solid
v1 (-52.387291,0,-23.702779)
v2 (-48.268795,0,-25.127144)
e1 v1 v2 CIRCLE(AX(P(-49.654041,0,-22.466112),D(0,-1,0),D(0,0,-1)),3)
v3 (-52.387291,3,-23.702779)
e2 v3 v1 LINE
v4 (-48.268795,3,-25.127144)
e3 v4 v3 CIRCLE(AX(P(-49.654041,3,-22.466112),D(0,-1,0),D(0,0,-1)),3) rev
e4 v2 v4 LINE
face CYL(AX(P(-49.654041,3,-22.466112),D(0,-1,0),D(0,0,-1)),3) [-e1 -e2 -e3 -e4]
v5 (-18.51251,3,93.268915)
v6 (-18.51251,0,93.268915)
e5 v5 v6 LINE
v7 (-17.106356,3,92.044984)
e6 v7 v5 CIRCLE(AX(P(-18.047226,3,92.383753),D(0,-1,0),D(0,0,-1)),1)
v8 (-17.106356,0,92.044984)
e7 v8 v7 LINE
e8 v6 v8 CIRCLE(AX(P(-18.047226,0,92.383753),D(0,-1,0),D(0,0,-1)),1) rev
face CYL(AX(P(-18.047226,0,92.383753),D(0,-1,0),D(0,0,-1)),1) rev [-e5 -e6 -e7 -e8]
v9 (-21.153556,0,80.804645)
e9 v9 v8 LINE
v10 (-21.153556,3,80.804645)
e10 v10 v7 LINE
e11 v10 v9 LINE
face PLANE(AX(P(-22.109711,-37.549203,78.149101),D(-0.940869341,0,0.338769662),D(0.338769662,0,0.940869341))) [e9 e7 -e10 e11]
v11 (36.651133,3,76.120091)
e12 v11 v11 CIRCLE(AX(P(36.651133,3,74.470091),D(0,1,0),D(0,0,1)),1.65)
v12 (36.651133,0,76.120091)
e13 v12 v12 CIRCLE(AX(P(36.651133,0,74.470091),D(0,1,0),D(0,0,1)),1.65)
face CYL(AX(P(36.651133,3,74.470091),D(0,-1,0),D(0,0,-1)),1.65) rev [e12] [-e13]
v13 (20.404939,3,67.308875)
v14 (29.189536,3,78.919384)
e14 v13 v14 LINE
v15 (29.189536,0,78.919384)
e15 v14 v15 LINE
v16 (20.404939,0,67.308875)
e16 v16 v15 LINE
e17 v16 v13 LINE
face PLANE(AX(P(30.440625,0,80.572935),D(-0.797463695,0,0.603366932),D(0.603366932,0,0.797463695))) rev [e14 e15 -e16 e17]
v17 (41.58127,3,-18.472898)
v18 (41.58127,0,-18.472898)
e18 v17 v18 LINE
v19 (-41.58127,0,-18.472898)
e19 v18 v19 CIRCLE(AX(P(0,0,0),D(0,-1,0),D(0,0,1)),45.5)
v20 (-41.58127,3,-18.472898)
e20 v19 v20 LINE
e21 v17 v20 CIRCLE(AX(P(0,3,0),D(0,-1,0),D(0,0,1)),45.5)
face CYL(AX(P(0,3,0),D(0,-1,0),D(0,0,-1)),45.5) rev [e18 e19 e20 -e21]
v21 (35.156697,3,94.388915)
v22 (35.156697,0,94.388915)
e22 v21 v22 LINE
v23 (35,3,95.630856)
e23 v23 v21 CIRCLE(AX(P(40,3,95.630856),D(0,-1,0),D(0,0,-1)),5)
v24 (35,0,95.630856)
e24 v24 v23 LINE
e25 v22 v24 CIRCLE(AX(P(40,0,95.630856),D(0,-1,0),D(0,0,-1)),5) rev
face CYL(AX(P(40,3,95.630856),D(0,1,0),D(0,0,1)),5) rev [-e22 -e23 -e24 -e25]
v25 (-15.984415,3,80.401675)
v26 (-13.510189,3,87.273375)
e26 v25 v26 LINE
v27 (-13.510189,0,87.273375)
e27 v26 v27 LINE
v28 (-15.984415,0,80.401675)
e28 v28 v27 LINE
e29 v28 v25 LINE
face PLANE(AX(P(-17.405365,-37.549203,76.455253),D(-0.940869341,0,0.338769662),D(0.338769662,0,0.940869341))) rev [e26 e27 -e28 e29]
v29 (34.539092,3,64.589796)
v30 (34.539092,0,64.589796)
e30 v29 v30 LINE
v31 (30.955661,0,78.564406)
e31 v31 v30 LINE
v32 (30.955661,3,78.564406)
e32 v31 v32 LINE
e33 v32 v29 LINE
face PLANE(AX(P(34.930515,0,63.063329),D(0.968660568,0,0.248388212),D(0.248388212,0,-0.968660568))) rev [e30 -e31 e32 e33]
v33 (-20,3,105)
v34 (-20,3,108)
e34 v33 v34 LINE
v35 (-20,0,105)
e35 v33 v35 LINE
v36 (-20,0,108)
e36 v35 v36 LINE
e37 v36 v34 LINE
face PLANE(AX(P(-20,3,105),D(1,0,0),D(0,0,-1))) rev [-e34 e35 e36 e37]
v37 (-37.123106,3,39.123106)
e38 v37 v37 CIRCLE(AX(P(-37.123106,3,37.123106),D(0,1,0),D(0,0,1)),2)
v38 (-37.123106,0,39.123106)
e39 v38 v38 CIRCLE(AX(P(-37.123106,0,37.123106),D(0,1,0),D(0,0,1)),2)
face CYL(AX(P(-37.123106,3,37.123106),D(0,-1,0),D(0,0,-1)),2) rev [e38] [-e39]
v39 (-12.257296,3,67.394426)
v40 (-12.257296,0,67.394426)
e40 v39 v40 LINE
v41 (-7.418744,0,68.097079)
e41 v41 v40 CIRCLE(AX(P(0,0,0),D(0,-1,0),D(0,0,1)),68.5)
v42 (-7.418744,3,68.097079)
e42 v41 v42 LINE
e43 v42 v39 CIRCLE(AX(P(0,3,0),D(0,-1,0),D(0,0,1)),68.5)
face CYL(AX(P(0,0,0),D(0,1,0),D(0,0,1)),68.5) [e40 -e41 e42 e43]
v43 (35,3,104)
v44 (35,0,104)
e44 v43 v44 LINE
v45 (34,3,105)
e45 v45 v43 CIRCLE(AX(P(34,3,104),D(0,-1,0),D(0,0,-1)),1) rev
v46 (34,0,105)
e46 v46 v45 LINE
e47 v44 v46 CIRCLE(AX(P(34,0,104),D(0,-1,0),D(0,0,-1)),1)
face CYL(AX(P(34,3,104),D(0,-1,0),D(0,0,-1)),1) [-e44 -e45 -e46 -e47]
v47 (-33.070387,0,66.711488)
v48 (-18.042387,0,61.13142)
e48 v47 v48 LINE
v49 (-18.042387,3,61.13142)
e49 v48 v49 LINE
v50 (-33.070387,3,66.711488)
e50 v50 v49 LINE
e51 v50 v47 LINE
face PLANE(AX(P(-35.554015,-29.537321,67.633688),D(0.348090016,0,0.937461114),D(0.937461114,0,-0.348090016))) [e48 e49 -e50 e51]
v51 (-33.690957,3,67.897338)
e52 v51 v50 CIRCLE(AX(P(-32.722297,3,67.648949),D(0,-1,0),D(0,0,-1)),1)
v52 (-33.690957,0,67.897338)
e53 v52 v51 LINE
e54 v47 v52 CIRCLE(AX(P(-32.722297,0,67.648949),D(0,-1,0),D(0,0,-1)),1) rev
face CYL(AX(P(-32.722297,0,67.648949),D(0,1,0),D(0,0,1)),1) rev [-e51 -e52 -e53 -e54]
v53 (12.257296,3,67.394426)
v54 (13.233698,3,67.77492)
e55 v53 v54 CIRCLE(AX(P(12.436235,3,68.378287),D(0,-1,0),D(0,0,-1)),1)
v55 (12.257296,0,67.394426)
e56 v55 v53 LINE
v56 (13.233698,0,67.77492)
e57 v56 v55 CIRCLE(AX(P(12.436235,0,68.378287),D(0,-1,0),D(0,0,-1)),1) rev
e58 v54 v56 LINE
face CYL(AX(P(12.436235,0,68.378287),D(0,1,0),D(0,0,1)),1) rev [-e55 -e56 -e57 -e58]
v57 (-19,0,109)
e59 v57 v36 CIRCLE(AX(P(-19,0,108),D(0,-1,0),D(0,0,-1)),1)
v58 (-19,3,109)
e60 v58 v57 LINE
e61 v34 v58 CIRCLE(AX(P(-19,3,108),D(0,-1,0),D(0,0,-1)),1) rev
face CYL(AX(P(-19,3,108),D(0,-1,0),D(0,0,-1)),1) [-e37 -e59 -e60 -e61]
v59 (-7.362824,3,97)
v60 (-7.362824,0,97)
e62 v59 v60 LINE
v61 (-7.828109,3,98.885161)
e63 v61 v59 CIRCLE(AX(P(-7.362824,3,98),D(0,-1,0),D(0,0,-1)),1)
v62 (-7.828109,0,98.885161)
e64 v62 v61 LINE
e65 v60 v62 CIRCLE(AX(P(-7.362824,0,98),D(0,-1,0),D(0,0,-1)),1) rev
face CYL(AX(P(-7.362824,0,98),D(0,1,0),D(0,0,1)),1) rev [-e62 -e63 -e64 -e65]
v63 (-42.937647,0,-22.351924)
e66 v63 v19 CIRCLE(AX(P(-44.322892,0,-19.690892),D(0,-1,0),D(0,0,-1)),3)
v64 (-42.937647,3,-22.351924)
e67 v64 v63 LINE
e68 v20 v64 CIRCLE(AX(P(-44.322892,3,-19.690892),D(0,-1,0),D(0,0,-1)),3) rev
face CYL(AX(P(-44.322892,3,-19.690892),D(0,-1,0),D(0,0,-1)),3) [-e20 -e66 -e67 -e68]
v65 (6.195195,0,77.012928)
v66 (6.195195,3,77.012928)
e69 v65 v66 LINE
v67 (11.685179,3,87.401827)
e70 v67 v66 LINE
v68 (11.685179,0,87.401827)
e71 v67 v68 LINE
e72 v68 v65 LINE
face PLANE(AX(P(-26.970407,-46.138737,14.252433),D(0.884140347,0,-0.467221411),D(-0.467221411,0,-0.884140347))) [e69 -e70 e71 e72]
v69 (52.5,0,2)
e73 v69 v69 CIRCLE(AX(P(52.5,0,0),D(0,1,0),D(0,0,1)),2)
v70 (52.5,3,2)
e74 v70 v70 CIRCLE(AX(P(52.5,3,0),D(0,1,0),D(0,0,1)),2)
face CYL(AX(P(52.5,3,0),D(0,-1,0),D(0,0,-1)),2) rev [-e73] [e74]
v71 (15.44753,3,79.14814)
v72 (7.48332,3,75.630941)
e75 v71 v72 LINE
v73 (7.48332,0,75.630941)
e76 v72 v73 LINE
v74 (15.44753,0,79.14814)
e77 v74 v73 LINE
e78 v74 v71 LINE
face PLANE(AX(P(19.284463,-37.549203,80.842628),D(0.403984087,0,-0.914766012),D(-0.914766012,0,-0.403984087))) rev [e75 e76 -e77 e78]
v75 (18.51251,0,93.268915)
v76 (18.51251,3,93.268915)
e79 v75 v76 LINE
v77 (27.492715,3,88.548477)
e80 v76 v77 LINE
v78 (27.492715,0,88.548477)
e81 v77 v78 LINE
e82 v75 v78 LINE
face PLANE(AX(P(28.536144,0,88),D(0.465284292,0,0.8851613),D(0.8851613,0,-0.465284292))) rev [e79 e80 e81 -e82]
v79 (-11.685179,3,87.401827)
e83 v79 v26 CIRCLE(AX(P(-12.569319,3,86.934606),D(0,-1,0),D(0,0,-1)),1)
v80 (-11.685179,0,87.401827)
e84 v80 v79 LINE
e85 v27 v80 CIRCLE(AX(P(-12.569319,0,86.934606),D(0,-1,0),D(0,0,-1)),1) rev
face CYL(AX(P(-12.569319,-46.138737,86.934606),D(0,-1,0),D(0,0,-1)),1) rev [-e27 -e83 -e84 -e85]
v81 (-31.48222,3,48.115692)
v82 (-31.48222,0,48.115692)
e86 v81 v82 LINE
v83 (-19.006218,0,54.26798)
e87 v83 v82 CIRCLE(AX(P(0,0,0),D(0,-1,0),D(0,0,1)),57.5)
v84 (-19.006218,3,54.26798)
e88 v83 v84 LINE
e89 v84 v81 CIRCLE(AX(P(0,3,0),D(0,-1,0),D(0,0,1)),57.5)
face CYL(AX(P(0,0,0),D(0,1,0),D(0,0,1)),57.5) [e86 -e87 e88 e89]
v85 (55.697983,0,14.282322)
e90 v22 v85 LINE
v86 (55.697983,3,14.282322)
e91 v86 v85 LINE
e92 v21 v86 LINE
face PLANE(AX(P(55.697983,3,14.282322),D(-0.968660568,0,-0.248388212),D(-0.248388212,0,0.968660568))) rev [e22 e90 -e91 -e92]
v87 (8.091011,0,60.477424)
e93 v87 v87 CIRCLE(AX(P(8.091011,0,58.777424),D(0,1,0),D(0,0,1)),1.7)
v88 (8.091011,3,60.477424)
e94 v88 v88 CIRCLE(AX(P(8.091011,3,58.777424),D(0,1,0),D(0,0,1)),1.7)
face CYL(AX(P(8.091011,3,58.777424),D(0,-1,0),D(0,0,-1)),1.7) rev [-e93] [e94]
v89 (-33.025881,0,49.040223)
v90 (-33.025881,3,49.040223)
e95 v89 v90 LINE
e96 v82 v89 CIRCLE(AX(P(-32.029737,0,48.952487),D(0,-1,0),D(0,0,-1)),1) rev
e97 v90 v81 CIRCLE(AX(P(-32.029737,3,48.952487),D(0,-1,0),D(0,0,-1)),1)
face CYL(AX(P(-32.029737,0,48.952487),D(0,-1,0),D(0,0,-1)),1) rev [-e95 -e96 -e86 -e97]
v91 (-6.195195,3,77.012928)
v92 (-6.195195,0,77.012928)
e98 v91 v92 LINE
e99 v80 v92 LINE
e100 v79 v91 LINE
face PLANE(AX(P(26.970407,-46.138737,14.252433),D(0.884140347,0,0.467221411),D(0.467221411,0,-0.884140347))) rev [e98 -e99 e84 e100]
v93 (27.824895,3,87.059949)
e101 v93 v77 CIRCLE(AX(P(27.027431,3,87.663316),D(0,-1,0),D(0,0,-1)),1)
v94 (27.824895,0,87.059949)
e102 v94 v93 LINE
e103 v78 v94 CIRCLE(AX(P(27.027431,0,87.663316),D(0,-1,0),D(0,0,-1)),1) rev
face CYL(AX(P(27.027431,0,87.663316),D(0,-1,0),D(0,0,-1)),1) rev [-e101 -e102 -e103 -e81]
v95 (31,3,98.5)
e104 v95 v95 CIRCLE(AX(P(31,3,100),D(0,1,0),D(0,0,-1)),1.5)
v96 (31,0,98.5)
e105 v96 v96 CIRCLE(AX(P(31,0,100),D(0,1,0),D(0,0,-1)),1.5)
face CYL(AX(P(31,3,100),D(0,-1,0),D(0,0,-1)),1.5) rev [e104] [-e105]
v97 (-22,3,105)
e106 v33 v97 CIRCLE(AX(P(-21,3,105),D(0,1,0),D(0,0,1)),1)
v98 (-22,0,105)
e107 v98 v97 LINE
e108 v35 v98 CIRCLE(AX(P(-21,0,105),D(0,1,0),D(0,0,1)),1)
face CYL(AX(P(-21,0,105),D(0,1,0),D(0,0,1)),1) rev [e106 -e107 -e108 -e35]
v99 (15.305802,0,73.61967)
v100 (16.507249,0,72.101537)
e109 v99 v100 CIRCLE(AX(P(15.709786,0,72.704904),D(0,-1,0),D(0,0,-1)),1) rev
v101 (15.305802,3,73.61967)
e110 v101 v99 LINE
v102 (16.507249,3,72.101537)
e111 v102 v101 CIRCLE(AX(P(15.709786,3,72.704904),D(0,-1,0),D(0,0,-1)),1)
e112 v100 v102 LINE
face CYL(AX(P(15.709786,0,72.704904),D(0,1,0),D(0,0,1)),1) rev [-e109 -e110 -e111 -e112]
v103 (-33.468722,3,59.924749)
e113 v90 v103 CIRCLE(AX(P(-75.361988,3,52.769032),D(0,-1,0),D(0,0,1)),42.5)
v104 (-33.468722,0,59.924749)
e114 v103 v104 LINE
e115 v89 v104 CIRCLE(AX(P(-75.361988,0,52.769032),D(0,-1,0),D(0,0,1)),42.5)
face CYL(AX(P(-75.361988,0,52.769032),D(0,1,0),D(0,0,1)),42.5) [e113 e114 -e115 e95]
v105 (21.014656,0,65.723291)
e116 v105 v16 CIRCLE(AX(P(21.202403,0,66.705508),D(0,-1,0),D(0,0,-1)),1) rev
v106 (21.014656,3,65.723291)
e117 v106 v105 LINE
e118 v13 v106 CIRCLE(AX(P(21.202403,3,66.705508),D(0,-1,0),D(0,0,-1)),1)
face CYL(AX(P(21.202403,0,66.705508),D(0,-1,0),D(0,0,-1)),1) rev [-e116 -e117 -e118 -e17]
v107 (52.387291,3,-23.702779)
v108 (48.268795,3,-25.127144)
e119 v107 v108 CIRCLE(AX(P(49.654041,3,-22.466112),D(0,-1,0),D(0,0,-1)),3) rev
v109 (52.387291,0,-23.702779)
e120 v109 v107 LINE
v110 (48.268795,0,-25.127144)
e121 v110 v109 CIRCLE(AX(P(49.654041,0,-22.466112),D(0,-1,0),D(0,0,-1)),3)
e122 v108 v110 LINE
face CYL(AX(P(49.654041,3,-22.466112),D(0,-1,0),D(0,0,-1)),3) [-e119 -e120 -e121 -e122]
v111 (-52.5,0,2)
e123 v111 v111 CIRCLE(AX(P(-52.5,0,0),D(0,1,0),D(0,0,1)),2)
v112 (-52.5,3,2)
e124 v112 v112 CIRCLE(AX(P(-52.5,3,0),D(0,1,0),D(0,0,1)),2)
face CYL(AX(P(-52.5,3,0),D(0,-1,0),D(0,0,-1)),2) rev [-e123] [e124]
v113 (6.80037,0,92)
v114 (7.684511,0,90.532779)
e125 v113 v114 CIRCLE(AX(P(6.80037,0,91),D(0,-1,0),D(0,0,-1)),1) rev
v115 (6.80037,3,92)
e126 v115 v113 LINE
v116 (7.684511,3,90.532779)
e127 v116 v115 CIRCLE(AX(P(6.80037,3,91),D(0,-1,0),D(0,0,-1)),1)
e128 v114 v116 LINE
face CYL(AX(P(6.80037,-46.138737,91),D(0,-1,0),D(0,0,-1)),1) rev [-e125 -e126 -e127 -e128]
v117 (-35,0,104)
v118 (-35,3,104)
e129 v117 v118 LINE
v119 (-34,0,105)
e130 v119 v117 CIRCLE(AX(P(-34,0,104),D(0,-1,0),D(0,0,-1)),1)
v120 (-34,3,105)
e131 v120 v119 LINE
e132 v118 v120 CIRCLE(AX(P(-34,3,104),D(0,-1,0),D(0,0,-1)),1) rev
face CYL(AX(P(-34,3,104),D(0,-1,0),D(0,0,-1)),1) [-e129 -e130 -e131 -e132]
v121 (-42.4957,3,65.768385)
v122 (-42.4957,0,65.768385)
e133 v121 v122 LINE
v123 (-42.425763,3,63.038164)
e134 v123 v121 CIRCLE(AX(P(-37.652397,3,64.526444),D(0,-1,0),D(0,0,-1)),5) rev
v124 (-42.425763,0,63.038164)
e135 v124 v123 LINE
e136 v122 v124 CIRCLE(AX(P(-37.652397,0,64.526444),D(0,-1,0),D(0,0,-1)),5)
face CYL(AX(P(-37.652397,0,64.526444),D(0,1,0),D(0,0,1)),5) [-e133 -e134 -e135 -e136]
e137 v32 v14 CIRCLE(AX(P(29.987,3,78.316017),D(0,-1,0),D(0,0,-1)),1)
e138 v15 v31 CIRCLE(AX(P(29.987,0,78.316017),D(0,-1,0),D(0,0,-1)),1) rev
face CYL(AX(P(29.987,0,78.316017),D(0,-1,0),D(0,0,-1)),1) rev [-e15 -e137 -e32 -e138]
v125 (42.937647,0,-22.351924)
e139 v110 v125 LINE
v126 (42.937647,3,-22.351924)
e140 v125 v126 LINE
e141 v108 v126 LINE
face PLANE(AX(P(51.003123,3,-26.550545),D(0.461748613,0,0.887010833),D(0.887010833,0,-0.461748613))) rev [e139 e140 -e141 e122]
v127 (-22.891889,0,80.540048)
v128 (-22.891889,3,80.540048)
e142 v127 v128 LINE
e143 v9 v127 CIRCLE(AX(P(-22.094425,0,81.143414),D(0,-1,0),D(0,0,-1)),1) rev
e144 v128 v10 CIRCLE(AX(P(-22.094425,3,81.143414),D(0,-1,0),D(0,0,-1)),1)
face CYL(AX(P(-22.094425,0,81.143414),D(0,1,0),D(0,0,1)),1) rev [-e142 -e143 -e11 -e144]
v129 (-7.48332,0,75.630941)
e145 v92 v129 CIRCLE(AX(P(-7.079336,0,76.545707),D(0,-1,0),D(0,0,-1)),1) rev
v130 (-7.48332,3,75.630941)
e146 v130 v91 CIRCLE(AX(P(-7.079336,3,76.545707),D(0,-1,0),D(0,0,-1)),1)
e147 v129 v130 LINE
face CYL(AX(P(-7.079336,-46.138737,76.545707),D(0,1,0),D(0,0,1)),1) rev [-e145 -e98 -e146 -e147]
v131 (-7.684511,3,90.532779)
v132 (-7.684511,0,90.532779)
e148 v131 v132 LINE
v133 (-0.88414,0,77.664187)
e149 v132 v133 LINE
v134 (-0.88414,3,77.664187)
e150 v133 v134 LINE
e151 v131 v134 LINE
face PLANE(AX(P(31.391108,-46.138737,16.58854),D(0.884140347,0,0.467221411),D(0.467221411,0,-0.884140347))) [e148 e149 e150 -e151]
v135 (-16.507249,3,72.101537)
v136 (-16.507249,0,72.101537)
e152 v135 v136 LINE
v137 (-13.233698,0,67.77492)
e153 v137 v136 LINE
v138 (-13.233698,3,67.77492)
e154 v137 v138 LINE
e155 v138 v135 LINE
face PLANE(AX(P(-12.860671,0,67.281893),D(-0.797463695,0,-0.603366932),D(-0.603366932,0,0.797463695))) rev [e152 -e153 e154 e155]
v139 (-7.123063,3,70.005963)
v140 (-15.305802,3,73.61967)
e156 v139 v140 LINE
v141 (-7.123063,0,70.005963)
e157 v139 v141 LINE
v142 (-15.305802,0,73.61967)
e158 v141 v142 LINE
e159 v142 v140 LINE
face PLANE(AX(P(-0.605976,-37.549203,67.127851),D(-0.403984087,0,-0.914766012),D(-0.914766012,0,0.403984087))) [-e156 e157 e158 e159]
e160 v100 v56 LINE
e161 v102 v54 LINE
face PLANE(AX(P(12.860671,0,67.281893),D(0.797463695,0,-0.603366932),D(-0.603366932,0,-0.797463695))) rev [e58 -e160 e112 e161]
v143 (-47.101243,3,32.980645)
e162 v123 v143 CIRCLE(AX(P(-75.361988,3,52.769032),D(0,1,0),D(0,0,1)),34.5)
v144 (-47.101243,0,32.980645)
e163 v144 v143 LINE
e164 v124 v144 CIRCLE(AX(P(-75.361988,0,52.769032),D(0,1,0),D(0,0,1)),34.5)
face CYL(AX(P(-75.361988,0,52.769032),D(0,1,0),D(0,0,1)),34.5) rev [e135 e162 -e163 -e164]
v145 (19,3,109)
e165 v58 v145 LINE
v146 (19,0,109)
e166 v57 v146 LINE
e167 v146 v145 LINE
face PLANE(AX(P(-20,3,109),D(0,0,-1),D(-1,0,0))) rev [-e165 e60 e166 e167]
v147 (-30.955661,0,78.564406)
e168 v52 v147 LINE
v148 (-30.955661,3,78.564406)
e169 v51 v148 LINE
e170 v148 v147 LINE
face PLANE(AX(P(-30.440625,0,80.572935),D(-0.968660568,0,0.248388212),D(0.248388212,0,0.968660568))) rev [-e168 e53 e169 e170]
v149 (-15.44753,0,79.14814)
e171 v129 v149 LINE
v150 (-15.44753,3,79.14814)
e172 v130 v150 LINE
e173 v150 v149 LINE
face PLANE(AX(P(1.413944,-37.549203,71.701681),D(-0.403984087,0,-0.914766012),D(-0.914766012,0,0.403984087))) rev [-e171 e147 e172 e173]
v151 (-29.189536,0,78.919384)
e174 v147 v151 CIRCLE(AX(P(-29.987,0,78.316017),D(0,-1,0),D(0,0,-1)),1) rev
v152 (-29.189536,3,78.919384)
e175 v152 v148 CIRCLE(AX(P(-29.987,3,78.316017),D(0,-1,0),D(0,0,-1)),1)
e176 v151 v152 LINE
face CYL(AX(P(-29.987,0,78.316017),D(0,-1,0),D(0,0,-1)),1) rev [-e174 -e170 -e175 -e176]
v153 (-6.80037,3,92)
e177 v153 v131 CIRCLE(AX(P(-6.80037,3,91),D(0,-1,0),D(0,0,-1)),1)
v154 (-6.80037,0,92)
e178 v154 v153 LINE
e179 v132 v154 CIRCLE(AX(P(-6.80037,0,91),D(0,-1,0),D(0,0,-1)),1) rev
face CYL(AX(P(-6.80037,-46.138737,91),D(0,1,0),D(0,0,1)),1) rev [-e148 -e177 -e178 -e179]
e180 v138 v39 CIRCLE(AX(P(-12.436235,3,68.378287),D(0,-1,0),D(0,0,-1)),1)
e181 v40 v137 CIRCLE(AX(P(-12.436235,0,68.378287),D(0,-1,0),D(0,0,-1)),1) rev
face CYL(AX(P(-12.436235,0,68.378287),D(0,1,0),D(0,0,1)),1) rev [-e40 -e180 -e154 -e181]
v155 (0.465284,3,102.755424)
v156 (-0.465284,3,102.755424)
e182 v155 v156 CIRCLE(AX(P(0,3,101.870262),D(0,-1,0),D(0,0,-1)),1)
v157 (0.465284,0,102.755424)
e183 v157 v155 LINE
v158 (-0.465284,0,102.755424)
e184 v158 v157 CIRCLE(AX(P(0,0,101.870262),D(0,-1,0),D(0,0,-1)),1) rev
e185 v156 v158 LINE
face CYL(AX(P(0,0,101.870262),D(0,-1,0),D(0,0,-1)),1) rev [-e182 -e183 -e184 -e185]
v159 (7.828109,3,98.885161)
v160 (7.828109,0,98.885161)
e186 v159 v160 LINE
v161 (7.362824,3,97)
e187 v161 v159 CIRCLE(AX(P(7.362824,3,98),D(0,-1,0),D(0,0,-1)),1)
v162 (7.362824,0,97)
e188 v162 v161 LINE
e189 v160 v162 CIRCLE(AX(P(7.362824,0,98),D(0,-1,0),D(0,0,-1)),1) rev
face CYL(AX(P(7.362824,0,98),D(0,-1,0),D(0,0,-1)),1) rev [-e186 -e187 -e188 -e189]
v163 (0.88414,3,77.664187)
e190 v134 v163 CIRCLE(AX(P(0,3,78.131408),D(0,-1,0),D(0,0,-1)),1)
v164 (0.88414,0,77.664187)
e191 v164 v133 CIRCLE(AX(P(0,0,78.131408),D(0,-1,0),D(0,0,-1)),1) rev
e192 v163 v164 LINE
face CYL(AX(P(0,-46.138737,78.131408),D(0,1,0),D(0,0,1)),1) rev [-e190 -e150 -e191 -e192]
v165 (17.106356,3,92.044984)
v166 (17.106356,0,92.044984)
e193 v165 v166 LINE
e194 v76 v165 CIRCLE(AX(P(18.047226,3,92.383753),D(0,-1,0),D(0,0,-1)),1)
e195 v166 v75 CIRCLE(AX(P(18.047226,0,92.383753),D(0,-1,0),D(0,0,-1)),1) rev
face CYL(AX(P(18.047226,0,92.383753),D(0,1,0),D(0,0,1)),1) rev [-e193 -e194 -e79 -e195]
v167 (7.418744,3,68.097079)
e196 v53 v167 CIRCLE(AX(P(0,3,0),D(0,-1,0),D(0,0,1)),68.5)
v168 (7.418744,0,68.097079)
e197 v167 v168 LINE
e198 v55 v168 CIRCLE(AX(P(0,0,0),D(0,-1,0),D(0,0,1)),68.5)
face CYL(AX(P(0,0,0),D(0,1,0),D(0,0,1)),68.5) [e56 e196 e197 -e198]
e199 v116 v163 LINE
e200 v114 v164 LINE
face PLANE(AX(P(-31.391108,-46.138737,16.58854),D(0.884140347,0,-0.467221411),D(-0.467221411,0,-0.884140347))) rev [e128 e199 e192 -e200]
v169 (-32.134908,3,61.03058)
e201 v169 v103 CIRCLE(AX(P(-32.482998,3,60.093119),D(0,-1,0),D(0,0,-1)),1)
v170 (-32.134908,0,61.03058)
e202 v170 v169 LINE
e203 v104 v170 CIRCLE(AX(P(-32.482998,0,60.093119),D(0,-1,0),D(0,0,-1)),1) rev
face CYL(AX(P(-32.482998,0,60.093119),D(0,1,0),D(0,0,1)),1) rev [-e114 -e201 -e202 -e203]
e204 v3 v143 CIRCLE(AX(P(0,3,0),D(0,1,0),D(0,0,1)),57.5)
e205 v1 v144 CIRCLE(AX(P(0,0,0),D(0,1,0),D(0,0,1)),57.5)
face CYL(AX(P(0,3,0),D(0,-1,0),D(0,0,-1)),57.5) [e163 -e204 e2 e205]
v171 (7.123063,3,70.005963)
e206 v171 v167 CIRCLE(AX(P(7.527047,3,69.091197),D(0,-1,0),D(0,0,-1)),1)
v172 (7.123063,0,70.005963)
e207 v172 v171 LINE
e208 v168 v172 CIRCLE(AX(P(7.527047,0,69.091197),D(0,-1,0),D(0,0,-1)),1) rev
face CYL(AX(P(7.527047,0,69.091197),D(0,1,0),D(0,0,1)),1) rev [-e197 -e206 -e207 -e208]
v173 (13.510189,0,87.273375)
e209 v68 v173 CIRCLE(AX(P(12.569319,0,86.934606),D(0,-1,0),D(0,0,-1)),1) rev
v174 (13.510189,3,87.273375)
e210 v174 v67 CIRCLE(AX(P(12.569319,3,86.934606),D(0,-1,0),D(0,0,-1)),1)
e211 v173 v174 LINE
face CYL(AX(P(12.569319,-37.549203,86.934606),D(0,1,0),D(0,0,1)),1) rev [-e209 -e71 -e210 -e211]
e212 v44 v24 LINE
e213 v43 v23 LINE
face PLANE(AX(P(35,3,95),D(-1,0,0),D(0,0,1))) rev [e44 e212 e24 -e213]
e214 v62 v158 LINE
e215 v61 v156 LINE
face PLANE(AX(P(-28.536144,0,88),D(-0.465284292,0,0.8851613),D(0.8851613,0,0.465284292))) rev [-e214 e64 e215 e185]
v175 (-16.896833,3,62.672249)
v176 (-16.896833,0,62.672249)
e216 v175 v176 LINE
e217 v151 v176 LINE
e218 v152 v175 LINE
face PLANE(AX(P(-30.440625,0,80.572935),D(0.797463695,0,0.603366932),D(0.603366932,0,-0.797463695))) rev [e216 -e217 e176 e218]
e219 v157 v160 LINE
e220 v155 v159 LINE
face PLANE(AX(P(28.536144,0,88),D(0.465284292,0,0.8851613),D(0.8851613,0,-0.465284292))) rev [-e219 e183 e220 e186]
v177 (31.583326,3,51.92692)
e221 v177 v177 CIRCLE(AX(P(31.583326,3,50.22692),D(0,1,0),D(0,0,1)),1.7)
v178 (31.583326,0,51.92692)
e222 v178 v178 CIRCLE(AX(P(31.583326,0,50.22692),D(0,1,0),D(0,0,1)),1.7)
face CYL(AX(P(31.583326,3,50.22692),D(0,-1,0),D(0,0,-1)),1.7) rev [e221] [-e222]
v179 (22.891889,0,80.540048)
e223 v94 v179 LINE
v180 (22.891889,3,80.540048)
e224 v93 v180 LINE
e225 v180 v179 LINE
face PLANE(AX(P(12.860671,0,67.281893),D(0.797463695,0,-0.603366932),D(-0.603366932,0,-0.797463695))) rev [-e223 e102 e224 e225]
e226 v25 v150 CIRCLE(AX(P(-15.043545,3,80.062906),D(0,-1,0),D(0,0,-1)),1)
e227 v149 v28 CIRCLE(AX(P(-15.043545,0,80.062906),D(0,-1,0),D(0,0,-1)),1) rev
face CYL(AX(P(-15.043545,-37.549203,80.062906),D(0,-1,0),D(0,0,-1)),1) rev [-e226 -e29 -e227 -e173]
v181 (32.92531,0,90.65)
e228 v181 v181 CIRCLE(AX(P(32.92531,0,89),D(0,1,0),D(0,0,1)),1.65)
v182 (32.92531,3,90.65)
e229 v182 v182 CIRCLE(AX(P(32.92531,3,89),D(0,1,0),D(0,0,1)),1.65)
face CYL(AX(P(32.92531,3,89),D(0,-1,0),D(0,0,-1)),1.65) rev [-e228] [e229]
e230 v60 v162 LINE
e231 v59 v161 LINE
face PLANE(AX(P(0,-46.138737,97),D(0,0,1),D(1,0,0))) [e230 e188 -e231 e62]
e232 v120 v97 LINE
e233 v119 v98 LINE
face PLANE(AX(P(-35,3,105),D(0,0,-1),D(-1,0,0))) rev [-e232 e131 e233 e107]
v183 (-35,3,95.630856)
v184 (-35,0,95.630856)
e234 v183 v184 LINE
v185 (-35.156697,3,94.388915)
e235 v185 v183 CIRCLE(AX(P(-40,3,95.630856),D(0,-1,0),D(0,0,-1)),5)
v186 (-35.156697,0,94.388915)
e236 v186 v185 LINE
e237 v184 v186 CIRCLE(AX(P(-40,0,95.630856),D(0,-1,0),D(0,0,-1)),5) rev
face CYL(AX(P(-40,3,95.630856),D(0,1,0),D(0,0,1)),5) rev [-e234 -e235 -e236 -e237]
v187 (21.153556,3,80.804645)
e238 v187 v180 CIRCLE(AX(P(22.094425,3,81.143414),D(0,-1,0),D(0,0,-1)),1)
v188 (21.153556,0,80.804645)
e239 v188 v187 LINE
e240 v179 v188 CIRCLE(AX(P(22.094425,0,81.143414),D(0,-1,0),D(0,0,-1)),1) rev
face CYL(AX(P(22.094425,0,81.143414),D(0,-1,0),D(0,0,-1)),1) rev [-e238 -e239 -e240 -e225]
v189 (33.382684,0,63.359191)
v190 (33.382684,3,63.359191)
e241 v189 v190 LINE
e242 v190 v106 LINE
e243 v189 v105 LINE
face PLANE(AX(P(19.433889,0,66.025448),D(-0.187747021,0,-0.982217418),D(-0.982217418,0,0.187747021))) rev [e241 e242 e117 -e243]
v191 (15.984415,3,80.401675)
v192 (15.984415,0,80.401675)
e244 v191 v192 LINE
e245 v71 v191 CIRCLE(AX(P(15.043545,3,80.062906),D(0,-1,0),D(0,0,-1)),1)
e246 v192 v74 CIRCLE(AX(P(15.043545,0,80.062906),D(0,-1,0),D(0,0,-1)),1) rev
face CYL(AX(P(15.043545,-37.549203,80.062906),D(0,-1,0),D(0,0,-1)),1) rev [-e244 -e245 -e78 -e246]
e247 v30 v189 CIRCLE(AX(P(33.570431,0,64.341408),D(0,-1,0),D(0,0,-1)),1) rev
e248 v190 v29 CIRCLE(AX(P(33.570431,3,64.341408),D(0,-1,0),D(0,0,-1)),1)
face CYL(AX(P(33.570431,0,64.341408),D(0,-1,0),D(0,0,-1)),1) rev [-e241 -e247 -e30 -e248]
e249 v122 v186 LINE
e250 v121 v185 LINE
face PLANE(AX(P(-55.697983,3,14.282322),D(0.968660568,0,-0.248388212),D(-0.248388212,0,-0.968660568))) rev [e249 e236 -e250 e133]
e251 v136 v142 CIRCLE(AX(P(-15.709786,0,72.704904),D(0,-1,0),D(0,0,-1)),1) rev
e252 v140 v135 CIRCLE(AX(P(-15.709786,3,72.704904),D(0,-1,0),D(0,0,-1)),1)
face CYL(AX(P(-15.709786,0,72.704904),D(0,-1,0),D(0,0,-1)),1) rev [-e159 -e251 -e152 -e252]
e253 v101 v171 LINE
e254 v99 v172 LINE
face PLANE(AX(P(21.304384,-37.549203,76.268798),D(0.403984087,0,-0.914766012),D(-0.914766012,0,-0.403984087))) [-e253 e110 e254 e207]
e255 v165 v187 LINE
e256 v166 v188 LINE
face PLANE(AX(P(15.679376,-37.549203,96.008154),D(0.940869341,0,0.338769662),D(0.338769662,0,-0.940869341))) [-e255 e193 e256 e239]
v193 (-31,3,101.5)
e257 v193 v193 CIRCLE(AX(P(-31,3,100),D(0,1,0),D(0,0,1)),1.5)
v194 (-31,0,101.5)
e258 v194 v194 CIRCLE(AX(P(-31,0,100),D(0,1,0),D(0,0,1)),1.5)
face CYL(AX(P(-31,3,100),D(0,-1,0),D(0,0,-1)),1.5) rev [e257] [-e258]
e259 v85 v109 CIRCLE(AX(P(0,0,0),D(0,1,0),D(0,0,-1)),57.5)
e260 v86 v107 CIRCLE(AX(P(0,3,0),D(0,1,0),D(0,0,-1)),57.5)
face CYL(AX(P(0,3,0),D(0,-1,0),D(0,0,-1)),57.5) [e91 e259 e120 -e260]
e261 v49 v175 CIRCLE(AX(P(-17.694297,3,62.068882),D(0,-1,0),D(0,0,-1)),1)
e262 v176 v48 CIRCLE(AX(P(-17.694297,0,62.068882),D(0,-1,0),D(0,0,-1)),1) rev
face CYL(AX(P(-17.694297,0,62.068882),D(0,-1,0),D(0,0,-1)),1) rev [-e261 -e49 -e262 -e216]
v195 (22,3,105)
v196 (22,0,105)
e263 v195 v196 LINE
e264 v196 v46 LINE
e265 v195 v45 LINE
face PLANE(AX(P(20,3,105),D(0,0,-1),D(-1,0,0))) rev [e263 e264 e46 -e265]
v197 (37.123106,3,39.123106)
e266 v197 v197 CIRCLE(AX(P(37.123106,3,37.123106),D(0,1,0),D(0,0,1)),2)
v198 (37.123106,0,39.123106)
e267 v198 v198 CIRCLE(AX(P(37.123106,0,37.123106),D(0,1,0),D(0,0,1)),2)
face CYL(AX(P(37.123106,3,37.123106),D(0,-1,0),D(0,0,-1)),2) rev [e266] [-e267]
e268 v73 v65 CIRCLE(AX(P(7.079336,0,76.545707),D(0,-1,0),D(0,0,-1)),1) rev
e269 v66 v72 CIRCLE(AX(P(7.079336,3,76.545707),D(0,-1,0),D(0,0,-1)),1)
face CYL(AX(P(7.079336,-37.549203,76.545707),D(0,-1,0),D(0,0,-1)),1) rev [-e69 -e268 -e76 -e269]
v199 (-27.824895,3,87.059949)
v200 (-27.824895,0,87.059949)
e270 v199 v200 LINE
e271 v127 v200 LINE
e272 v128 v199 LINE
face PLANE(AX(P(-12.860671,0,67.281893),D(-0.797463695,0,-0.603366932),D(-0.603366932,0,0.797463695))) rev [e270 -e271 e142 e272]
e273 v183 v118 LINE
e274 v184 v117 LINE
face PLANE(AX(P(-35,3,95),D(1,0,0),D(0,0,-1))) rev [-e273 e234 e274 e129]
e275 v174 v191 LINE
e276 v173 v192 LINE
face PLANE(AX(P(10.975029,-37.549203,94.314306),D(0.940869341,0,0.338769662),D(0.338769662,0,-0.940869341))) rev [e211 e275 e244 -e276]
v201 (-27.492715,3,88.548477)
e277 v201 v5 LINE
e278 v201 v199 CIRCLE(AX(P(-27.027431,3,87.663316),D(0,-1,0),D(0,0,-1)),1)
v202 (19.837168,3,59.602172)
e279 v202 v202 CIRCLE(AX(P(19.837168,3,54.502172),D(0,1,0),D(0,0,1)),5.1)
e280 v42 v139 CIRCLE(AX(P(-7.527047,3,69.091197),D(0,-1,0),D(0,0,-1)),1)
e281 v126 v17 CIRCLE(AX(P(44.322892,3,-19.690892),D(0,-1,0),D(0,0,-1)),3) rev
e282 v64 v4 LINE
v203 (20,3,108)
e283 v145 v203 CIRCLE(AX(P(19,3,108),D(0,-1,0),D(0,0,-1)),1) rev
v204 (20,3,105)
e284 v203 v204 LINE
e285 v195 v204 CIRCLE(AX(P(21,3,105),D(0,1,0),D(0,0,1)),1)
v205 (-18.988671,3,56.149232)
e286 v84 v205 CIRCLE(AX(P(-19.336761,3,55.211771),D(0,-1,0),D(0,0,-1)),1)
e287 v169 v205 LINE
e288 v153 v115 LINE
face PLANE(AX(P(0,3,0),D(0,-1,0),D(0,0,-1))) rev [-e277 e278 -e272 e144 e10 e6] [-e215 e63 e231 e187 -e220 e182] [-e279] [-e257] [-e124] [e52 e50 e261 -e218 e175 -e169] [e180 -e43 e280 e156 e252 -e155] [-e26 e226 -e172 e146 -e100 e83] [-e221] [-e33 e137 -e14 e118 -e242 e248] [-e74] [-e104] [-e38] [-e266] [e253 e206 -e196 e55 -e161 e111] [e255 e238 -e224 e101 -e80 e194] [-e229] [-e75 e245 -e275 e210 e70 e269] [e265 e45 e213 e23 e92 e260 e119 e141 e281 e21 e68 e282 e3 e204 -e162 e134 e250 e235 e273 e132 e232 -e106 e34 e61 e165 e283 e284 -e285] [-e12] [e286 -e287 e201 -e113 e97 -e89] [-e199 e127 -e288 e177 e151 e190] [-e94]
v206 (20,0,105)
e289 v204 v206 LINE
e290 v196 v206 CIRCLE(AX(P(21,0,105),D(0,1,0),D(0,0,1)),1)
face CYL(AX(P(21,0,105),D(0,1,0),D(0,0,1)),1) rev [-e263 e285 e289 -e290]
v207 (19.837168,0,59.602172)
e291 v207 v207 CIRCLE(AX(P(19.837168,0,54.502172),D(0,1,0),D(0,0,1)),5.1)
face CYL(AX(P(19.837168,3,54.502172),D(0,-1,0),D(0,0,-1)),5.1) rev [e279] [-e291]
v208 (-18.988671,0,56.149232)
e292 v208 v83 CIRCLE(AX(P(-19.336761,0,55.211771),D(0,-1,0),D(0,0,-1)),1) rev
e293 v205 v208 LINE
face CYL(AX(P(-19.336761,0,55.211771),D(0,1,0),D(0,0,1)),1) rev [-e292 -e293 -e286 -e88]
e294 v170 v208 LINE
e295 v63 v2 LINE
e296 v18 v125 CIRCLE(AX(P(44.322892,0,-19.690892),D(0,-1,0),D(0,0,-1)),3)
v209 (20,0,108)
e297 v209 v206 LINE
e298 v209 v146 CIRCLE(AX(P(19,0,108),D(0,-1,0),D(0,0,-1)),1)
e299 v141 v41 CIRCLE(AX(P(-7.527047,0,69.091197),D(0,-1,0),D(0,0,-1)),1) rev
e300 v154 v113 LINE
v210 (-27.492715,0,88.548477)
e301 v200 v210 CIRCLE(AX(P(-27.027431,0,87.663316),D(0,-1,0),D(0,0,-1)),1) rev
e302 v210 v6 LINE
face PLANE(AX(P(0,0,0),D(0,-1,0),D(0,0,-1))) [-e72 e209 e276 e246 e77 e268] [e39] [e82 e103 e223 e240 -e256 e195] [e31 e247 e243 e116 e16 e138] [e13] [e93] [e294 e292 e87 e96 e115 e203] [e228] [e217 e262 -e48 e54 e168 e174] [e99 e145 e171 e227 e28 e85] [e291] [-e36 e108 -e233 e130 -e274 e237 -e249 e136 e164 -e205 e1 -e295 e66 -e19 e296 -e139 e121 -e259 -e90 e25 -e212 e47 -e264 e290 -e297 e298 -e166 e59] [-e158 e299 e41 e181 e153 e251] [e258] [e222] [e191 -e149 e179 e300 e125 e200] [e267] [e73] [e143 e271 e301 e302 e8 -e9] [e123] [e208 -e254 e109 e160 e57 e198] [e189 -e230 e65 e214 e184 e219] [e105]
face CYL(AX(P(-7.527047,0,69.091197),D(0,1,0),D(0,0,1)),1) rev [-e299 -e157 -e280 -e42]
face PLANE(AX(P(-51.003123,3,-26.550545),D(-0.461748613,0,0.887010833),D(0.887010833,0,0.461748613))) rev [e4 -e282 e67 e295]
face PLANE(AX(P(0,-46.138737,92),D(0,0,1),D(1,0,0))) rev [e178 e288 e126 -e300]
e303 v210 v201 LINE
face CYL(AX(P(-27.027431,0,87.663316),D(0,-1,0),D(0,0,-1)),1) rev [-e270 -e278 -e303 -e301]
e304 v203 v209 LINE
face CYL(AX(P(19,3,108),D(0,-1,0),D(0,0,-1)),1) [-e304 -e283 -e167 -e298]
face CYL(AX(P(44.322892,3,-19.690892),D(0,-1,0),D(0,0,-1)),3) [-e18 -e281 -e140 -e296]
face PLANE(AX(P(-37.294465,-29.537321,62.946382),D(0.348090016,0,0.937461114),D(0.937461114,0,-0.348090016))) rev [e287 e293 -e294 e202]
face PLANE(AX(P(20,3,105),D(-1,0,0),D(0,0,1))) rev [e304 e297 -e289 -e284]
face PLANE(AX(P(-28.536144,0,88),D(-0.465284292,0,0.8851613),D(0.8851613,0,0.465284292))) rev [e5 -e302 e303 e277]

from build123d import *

# Parameters (mm, degrees)
SKETCH_1_R          = 1.7
SKETCH_1_R_2        = 1.5
SKETCH_1_R_3        = 2
SKETCH_1_R_4        = 5.1
SKETCH_1_R_5        = 1.65
EXTRUDE_1_DEPTH     = 3
SKETCH_3_R          = 1
CUT_EXTRUDE_3_DEPTH = 124.273070863
CUT_EXTRUDE_4_DEPTH = 124.273070863
EXTRUDE_START       = -3
EXTRUDE_1_2_DEPTH   = 3
EXTRUDE_2_DEPTH     = 3
FILLET_4_R          = 1
FILLET_6_R          = 5
FILLET_7_R          = 3


# Read off the part's stored shape, not the designer's step: 拉伸-薄壁1
with BuildPart() as part:
    # 草图1 → Extrude 1 (new body)
    with BuildSketch(Plane(origin=(0, 0, 0), x_dir=(1, 0, 0), z_dir=(0, 1, 0))):
        with BuildLine():
            Line((-51.003122908, 26.550545261), (-40.35899291, 21.009561902))
            ThreePointArc((-40.35899291, 21.009561902), (0, -45.5), (40.35899291, 21.009561902))
            Line((40.35899291, 21.009561902), (51.003122908, 26.550545261))
            ThreePointArc((51.003122908, 26.550545261), (57.123657521, 6.567933576), (55.697982668, -14.282322175))
            Line((55.697982668, -14.282322175), (35, -95))
            Line((35, -95), (35, -105))
            Line((35, -105), (20, -105))
            Line((20, -105), (20, -109))
            Line((20, -109), (-20, -109))
            Line((-20, -109), (-20, -105))
            Line((-20, -105), (-35, -105))
            Line((-35, -105), (-35, -95))
            Line((-35, -95), (-55.697982668, -14.282322175))
            ThreePointArc((-55.697982668, -14.282322175), (-57.123657521, 6.567933576), (-51.003122908, 26.550545261))
        make_face()
        with Locations(Location((8.091010553, -58.777423797, 0), (0, 0, 270))):
            Circle(SKETCH_1_R, mode=Mode.SUBTRACT)
        with Locations(Location((31.583326073, -50.226920214, 0), (0, 0, 270))):
            Circle(SKETCH_1_R, mode=Mode.SUBTRACT)
        with Locations(Location((-31, -100, 0), (0, 0, 270))):
            Circle(SKETCH_1_R_2, mode=Mode.SUBTRACT)
        with Locations(Location((31, -100, 0), (0, 0, 90))):
            Circle(SKETCH_1_R_2, mode=Mode.SUBTRACT)
        with Locations(Location((-37.123106012, -37.123106012, 0), (0, 0, 270))):
            Circle(SKETCH_1_R_3, mode=Mode.SUBTRACT)
        with Locations(Location((-52.5, 0, 0), (0, 0, 270))):
            Circle(SKETCH_1_R_3, mode=Mode.SUBTRACT)
        with Locations(Location((52.5, 0, 0), (0, 0, 270))):
            Circle(SKETCH_1_R_3, mode=Mode.SUBTRACT)
        with Locations(Location((37.123106012, -37.123106012, 0), (0, 0, 270))):
            Circle(SKETCH_1_R_3, mode=Mode.SUBTRACT)
        with Locations(Location((19.837168313, -54.502172006, 0), (0, 0, 270))):
            Circle(SKETCH_1_R_4, mode=Mode.SUBTRACT)
        with Locations(Location((32.925309654, -89, 0), (0, 0, 270))):
            Circle(SKETCH_1_R_5, mode=Mode.SUBTRACT)
        with Locations(Location((36.65113283, -74.470091478, 0), (0, 0, 270))):
            Circle(SKETCH_1_R_5, mode=Mode.SUBTRACT)
    extrude(amount=EXTRUDE_1_DEPTH)

    # 草图3 → 切除-拉伸3 (cut, through all)
    with BuildSketch(Plane(origin=(0, 3, 0), x_dir=(1, 0, 0), z_dir=(0, 1, 0))):
        with Locations((-21, -105)):
            Circle(SKETCH_3_R)
        with Locations((21, -105)):
            Circle(SKETCH_3_R)
    extrude(amount=-CUT_EXTRUDE_3_DEPTH, mode=Mode.SUBTRACT)

    # 草图4 → 切除-拉伸4 (cut, through all)
    with BuildSketch(Plane(origin=(0, 3, 0), x_dir=(1, 0, 0), z_dir=(0, 1, 0))):
        with BuildLine():
            Line((-30.440624747, -80.572934593), (-12.021970306, -56.229193752))
            ThreePointArc((-12.021970306, -56.229193752), (-23.121395009, -52.646472748), (-33.269507662, -46.897653033))
            ThreePointArc((-33.269507662, -46.897653033), (-32.970979927, -55.81081258), (-34.539030241, -64.590035219))
            Line((-34.539030241, -64.590035219), (-30.440624747, -80.572934593))
        make_face()
        Polygon((19.433888905, -66.025448201), (34.930515062, -63.063328668), (30.440624747, -80.572934593), align=None)
        with BuildLine():
            Line((28.536143905, -88), (0, -103))
            Line((0, -103), (-28.536143905, -88))
            Line((-28.536143905, -88), (-12.86067095, -67.281893127))
            ThreePointArc((-12.86067095, -67.281893127), (0, -68.5), (12.86067095, -67.281893127))
            Line((12.86067095, -67.281893127), (28.536143905, -88))
        make_face()
        with BuildLine():
            Line((-42.861253018, -64.342805115), (-55.697982668, -14.282322175))
            ThreePointArc((-55.697982668, -14.282322175), (-52.242961211, -24.01922155), (-47.101242547, -32.98064509))
            ThreePointArc((-47.101242547, -32.98064509), (-41.173018347, -48.146873673), (-42.861253018, -64.342805115))
        make_face()
    extrude(amount=-CUT_EXTRUDE_4_DEPTH, mode=Mode.SUBTRACT)

    # Extrude 1 2 outline → Extrude 1 2 (add)
    with BuildSketch(Plane(origin=(0, 3, 0), x_dir=(1, 0, 0), z_dir=(0, 1, 0)).offset(EXTRUDE_START)):
        with BuildLine():
            Line((21.778618406, -79.068649994), (18.835174857, -75.178331775))
            Line((18.835174857, -75.178331775), (3.50933235, -68.410047409))
            ThreePointArc((3.50933235, -68.410047409), (0, -68.5), (-3.50933235, -68.410047409))
            Line((-3.50933235, -68.410047409), (-18.835174857, -75.178331775))
            Line((-18.835174857, -75.178331775), (-21.778618406, -79.068649994))
            Line((-21.778618406, -79.068649994), (-16.234523365, -94.466336472))
            Line((-16.234523365, -94.466336472), (-11.414457562, -97))
            Line((-11.414457562, -97), (11.414457562, -97))
            Line((11.414457562, -97), (16.234523365, -94.466336472))
            Line((16.234523365, -94.466336472), (21.778618406, -79.068649994))
        make_face()
        Polygon((-12.743110853, -89.403790429), (-16.300181473, -79.524692438), (-4.850437176, -74.468192262), align=None, mode=Mode.SUBTRACT)
        Polygon((0, -75.991095057), (8.459859541, -92), (-8.459859541, -92), align=None, mode=Mode.SUBTRACT)
        Polygon((4.850437176, -74.468192262), (16.300181473, -79.524692438), (12.743110853, -89.403790429), align=None, mode=Mode.SUBTRACT)
    extrude(amount=EXTRUDE_1_2_DEPTH)

    # 草图5<3> → 拉伸-薄壁2 (add)
    with BuildSketch(Plane(origin=(0, 3, 0), x_dir=(1, 0, 0), z_dir=(0, 1, 0))):
        Polygon((-35.554014882, -67.633687886), (-11.151745265, -58.572846537), (-12.892195346, -53.885540966), (-37.294464963, -62.946382315), align=None)
    extrude(amount=-EXTRUDE_2_DEPTH)

    # 圆角4
    fillet_4_edges = [part.edges().sort_by_distance(p)[0] for p in [
        (30.440624747, 1.5, 80.572934593),
        (19.433888905, 1.5, 66.025448201),
        (34.930515062, 1.5, 63.063328668),
        (-12.86067095, 1.5, 67.281893127),
        (12.86067095, 1.5, 67.281893127),
        (28.536143905, 1.5, 88),
        (0, 1.5, 103),
        (-28.536143905, 1.5, 88),
        (-30.440624747, 1.5, 80.572934593),
        (-33.269507662, 1.5, 46.897653033),
        (-21.778618406, 1.5, 79.068649994),
        (-18.835174857, 1.5, 75.178331775),
        (-11.414457562, 1.5, 97),
        (16.234523365, 1.5, 94.466336472),
        (18.835174857, 1.5, 75.178331775),
        (3.50933235, 1.5, 68.410047409),
        (21.778618406, 1.5, 79.068649994),
        (11.414457562, 1.5, 97),
        (-3.50933235, 1.5, 68.410047409),
        (-16.234523365, 1.5, 94.466336472),
        (-16.300181473, 1.5, 79.524692438),
        (4.850437176, 1.5, 74.468192262),
        (16.300181473, 1.5, 79.524692438),
        (12.743110853, 1.5, 89.403790429),
        (-4.850437176, 1.5, 74.468192262),
        (-12.743110853, 1.5, 89.403790429),
        (8.459859541, 1.5, 92),
        (-8.459859541, 1.5, 92),
        (0, 1.5, 75.991095057),
        (35, 1.5, 105),
        (20, 1.5, 109),
        (-20, 1.5, 109),
        (-35, 1.5, 105),
        (-14.827987759, 1.5, 59.937877353),
        (-16.285565355, 1.5, 55.145537998),
        (-33.79999967, 1.5, 61.648847449),
        (-33.914652527, 1.5, 67.024973924),
    ]]
    fillet(fillet_4_edges, radius=FILLET_4_R)

    # 圆角6
    fillet_6_edges = [part.edges().sort_by_distance(p)[0] for p in [
        (-42.861253018, 1.5, 64.342805115),
        (-35, 1.5, 95),
        (35, 1.5, 95),
    ]]
    fillet(fillet_6_edges, radius=FILLET_6_R)

    # 圆角7
    fillet_7_edges = [part.edges().sort_by_distance(p)[0] for p in [
        (-51.003122908, 1.5, -26.550545261),
        (-40.35899291, 1.5, -21.009561902),
        (40.35899291, 1.5, -21.009561902),
        (51.003122908, 1.5, -26.550545261),
    ]]
    fillet(fillet_7_edges, radius=FILLET_7_R)


solid = part.part
